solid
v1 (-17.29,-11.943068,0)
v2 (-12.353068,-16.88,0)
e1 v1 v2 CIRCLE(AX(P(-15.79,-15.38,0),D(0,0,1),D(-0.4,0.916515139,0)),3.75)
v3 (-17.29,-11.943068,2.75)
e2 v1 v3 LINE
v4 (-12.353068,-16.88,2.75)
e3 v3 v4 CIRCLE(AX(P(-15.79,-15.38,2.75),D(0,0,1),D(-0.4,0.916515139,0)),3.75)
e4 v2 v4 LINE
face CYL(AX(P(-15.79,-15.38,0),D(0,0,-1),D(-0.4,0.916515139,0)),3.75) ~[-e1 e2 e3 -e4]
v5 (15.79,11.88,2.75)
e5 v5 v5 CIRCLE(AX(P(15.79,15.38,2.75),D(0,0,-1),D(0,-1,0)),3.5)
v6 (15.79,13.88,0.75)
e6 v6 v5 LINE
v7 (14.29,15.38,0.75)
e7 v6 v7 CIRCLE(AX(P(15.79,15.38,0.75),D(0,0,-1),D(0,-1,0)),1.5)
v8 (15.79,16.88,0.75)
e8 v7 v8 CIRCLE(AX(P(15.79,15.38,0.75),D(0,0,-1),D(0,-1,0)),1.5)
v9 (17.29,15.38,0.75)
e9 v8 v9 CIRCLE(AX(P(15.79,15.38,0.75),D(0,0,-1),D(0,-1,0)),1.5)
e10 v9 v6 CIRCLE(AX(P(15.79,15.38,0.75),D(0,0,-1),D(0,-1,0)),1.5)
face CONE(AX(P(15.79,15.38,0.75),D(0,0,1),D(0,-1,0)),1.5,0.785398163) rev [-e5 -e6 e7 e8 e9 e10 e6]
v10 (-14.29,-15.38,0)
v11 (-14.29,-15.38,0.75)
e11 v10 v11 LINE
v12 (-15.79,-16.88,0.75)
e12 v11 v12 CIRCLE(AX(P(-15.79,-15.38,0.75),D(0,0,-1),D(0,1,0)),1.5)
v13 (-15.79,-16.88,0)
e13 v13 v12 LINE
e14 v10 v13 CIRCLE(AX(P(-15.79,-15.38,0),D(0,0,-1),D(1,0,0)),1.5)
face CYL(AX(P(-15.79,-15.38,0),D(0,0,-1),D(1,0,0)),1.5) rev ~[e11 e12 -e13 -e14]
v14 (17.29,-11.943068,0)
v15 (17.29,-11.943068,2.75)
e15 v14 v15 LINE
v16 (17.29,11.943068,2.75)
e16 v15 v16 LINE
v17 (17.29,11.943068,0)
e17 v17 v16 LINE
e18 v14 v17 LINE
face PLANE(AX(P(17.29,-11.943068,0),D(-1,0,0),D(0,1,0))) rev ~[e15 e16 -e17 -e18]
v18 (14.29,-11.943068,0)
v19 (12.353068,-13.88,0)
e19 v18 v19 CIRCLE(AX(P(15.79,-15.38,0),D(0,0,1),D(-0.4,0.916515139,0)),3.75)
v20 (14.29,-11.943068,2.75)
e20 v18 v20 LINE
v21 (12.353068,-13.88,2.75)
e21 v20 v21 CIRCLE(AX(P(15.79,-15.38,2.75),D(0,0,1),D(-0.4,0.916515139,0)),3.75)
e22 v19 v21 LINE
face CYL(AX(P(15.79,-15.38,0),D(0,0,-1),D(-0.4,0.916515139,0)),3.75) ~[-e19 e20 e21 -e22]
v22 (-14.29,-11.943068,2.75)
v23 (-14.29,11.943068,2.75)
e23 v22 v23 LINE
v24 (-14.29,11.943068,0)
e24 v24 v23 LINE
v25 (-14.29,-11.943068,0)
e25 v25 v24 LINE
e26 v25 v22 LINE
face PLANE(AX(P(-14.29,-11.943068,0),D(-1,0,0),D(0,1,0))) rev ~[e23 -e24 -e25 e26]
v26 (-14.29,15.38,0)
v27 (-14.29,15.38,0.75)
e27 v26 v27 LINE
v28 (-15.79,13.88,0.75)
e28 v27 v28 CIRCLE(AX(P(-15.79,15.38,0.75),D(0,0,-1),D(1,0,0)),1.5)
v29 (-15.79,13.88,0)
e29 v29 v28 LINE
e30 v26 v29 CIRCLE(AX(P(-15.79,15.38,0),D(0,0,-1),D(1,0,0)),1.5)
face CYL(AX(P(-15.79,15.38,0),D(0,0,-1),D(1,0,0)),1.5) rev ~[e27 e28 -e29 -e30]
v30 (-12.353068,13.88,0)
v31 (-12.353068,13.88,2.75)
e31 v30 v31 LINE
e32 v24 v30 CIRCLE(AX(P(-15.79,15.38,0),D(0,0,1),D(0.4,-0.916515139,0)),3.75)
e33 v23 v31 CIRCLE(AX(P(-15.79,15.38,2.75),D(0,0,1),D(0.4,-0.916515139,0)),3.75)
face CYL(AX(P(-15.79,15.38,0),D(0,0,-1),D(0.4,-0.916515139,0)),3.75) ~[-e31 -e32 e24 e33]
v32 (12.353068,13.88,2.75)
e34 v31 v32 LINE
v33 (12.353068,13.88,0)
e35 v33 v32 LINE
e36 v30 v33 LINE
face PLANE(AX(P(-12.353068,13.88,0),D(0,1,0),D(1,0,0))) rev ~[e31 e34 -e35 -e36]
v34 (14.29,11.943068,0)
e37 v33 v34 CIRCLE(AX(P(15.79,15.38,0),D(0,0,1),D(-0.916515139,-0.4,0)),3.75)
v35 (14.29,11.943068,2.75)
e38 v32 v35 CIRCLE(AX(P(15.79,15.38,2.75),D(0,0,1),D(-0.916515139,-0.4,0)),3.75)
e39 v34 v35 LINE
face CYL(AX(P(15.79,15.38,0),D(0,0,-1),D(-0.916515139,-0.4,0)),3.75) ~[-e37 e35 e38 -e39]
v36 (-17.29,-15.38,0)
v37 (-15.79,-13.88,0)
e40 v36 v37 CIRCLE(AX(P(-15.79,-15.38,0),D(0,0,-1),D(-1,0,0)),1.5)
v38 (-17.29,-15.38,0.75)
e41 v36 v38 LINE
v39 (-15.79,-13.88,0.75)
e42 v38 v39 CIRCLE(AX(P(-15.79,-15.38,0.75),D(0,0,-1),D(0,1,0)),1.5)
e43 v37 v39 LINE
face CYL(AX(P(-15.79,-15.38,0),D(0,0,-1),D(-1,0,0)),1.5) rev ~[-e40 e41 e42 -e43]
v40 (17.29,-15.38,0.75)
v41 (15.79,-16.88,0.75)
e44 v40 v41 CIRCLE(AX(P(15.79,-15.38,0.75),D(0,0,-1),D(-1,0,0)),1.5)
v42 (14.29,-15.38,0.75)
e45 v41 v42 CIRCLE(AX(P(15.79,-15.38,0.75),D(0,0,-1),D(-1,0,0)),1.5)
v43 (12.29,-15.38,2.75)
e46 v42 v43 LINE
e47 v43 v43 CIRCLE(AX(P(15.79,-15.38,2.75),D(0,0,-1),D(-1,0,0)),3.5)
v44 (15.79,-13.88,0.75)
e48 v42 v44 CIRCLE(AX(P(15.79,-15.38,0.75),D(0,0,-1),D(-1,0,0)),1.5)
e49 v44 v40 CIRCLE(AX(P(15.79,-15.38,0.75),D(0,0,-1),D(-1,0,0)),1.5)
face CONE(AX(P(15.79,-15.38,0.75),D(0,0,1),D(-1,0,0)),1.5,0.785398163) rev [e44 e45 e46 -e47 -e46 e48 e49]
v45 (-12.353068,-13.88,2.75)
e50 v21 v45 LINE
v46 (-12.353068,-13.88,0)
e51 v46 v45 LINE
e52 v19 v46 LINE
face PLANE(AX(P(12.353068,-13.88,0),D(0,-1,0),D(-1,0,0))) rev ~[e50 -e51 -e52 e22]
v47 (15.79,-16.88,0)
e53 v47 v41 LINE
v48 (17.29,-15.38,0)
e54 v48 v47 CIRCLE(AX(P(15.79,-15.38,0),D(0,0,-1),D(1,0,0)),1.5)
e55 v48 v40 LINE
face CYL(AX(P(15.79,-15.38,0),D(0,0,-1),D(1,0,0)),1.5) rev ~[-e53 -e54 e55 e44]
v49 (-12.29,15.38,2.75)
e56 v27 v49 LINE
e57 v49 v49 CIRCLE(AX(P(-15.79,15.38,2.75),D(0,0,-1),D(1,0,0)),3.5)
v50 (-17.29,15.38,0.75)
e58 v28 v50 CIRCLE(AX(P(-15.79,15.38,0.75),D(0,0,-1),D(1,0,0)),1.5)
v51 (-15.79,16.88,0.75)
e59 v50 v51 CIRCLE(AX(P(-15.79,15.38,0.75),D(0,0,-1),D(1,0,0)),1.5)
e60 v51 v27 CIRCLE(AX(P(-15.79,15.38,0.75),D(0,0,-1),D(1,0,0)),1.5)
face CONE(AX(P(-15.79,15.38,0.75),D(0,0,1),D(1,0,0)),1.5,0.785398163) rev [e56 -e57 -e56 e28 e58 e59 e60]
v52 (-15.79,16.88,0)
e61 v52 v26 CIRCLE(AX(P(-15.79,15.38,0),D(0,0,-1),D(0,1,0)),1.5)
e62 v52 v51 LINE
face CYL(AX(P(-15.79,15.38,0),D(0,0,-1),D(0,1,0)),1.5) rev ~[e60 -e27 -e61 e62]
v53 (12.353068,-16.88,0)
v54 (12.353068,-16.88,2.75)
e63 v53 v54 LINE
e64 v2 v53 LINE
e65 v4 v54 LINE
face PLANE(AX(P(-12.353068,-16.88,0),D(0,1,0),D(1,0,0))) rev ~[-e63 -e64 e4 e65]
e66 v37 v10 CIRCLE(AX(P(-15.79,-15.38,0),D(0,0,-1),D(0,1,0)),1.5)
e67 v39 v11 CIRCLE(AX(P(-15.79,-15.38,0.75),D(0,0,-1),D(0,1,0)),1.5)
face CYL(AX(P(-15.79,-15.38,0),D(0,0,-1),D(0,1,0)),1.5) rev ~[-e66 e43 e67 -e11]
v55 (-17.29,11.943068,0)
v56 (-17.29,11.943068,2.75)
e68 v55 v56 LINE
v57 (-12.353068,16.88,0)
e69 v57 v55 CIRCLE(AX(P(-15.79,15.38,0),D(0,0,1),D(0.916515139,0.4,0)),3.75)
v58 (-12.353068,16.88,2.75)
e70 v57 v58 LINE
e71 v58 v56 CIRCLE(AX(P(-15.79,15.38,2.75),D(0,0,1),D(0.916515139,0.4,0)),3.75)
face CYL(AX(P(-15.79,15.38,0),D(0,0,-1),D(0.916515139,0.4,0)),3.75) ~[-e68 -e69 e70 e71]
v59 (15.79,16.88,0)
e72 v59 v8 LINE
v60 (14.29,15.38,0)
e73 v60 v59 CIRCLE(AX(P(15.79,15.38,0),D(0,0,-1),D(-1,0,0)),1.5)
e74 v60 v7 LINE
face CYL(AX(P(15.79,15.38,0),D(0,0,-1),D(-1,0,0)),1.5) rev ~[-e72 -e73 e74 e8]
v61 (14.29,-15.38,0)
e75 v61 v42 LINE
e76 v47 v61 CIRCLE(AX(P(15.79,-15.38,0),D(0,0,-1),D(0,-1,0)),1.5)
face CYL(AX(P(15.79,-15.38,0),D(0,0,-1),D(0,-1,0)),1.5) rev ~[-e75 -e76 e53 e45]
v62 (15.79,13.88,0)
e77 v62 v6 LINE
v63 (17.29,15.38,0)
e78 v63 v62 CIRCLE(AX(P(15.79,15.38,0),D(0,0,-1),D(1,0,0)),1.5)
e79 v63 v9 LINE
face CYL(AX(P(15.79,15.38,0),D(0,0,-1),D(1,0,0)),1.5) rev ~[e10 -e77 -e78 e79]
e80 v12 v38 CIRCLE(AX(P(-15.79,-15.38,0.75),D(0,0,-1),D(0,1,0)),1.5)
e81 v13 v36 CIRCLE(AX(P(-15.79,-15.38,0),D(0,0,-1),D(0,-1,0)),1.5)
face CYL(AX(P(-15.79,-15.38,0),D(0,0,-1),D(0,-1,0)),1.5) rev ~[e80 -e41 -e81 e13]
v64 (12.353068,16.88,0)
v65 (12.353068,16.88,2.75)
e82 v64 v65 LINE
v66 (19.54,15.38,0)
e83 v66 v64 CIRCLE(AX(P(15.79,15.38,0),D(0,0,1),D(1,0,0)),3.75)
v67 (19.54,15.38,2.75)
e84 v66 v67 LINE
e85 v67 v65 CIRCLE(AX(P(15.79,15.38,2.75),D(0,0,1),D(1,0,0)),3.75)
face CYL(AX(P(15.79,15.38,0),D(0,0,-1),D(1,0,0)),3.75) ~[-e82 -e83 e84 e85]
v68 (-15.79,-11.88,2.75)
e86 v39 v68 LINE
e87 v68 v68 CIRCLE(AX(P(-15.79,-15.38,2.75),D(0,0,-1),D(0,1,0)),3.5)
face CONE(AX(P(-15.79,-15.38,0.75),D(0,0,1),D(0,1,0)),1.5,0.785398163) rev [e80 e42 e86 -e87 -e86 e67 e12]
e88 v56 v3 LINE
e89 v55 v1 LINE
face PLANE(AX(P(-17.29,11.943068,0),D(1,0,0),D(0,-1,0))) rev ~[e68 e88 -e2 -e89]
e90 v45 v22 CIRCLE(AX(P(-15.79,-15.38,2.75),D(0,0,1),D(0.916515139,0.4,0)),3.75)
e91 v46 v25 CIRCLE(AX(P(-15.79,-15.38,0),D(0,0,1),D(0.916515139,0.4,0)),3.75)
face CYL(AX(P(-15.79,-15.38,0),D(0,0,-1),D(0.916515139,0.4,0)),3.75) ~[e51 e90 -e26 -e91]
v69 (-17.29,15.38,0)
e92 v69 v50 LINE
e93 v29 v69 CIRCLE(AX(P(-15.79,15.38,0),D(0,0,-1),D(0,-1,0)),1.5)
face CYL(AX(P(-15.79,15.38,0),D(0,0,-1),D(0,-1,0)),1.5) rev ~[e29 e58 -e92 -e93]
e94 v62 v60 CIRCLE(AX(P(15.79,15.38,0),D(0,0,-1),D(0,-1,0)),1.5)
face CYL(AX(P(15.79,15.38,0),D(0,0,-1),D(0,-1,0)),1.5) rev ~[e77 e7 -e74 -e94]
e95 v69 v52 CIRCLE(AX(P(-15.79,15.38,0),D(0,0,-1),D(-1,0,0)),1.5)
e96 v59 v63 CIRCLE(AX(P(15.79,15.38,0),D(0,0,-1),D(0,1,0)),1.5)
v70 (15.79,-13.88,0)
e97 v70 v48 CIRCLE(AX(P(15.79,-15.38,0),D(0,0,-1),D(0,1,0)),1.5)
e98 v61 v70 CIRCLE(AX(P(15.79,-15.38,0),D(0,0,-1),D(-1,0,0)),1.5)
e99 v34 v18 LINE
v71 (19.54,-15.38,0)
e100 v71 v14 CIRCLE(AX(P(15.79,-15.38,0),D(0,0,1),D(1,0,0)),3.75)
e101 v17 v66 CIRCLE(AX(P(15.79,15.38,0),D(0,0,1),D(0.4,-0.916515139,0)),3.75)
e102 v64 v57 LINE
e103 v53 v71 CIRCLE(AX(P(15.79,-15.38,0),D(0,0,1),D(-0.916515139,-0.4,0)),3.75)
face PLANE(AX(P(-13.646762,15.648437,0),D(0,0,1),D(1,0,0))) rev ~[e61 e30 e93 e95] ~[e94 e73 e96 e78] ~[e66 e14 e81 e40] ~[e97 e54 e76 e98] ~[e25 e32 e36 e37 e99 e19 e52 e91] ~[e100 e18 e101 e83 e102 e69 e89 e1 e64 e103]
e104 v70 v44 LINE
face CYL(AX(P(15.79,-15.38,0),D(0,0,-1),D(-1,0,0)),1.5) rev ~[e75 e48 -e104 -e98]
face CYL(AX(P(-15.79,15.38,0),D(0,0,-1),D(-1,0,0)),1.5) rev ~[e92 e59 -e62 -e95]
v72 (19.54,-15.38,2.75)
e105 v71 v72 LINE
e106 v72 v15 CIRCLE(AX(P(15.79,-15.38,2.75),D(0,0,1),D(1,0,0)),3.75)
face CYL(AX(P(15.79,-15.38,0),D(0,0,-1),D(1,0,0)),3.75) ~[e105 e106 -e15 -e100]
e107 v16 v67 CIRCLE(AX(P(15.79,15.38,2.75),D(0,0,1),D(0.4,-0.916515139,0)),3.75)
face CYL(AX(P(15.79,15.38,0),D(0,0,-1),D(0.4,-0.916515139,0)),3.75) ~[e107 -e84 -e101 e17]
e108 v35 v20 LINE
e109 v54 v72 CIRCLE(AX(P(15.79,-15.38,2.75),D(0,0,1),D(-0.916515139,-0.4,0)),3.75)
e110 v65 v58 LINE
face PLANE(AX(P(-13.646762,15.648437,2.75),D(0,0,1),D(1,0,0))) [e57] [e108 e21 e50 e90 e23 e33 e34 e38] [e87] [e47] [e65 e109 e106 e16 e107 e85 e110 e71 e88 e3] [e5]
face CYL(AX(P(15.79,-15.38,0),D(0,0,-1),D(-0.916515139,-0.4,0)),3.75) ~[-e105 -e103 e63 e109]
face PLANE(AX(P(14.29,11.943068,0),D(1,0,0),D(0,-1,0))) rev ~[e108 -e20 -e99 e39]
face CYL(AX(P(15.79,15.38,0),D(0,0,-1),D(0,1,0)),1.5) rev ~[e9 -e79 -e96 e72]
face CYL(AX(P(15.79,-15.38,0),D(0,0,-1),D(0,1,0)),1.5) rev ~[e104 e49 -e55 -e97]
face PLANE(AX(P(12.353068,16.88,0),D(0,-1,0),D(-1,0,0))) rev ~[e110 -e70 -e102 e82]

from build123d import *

# Parameters (mm, degrees)
F1_DEPTH = 2.75


# Not quite as in the source:
# - a fillet or chamfer that OpenCascade refuses, or shapes differently, is made with other operations: its cross-section is extruded or revolved along the edge and cut away or added


with BuildPart() as f1:
    # F0 (on Top) → F1 (new body)
    with BuildSketch(Plane.XY):
        with BuildLine():
            ThreePointArc((-15.79, 16.88), (-14.7293398282, 16.4406601718), (-14.29, 15.38))
            Line((-14.29, 15.38), (-14.29, 13.88))
            Line((-14.29, 13.88), (-12.3530682288, 13.88))
            ThreePointArc((-12.3530682288, 13.88), (-12.1191013265, 14.6138388362), (-12.04, 15.38))
            ThreePointArc((-12.04, 15.38), (-12.1191013265, 16.1461611638), (-12.3530682288, 16.88))
            Line((-12.3530682288, 16.88), (-15.79, 16.88))
        make_face()
        with BuildLine():
            ThreePointArc((-17.29, 15.38), (-16.8506601718, 16.4406601718), (-15.79, 16.88))
            Line((-15.79, 16.88), (-12.3530682288, 16.88))
            ThreePointArc((-12.3530682288, 16.88), (-18.4416504294, 18.0316504294), (-17.29, 11.9430682288))
            Line((-17.29, 11.9430682288), (-17.29, 15.38))
        make_face()
        with BuildLine():
            Line((-14.29, 13.88), (-15.79, 13.88))
            ThreePointArc((-15.79, 13.88), (-16.8506601718, 14.3193398282), (-17.29, 15.38))
            Line((-17.29, 15.38), (-17.29, 11.9430682288))
            ThreePointArc((-17.29, 11.9430682288), (-15.79, 11.63), (-14.29, 11.9430682288))
            Line((-14.29, 11.9430682288), (-14.29, 13.88))
        make_face()
        with BuildLine():
            Line((12.3530682288, 16.88), (-12.3530682288, 16.88))
            ThreePointArc((-12.3530682288, 16.88), (-12.1191013265, 16.1461611638), (-12.04, 15.38))
            ThreePointArc((-12.04, 15.38), (-12.1191013265, 14.6138388362), (-12.3530682288, 13.88))
            Line((-12.3530682288, 13.88), (12.3530682288, 13.88))
            ThreePointArc((12.3530682288, 13.88), (12.04, 15.38), (12.3530682288, 16.88))
        make_face()
        with BuildLine():
            Line((-14.29, -11.9430682288), (-14.29, 11.9430682288))
            ThreePointArc((-14.29, 11.9430682288), (-15.79, 11.63), (-17.29, 11.9430682288))
            Line((-17.29, 11.9430682288), (-17.29, -11.9430682288))
            ThreePointArc((-17.29, -11.9430682288), (-15.79, -11.63), (-14.29, -11.9430682288))
        make_face()
        with BuildLine():
            Line((15.79, 16.88), (12.3530682288, 16.88))
            ThreePointArc((12.3530682288, 16.88), (12.04, 15.38), (12.3530682288, 13.88))
            Line((12.3530682288, 13.88), (14.29, 13.88))
            Line((14.29, 13.88), (14.29, 15.38))
            ThreePointArc((14.29, 15.38), (14.7293398282, 16.4406601718), (15.79, 16.88))
        make_face()
        with BuildLine():
            ThreePointArc((19.54, 15.38), (16.5561611638, 19.0508986735), (12.3530682288, 16.88))
            Line((12.3530682288, 16.88), (15.79, 16.88))
            ThreePointArc((15.79, 16.88), (16.8506601718, 16.4406601718), (17.29, 15.38))
            Line((17.29, 15.38), (17.29, 11.9430682288))
            ThreePointArc((17.29, 11.9430682288), (18.9274750995, 13.3260404094), (19.54, 15.38))
        make_face()
        with BuildLine():
            Line((-14.29, -13.88), (-14.29, -11.9430682288))
            ThreePointArc((-14.29, -11.9430682288), (-15.79, -11.63), (-17.29, -11.9430682288))
            Line((-17.29, -11.9430682288), (-17.29, -15.38))
            ThreePointArc((-17.29, -15.38), (-16.8506601718, -14.3193398282), (-15.79, -13.88))
            Line((-15.79, -13.88), (-14.29, -13.88))
        make_face()
        with BuildLine():
            Line((-17.29, -15.38), (-17.29, -11.9430682288))
            ThreePointArc((-17.29, -11.9430682288), (-18.4416504294, -18.0316504294), (-12.3530682288, -16.88))
            Line((-12.3530682288, -16.88), (-15.79, -16.88))
            ThreePointArc((-15.79, -16.88), (-16.8506601718, -16.4406601718), (-17.29, -15.38))
        make_face()
        with BuildLine():
            Line((12.3530682288, -13.88), (-12.3530682288, -13.88))
            ThreePointArc((-12.3530682288, -13.88), (-12.1191013265, -14.6138388362), (-12.04, -15.38))
            ThreePointArc((-12.04, -15.38), (-12.1191013265, -16.1461611638), (-12.3530682288, -16.88))
            Line((-12.3530682288, -16.88), (12.3530682288, -16.88))
            ThreePointArc((12.3530682288, -16.88), (12.04, -15.38), (12.3530682288, -13.88))
        make_face()
        with BuildLine():
            ThreePointArc((-12.04, -15.38), (-12.1191013265, -14.6138388362), (-12.3530682288, -13.88))
            Line((-12.3530682288, -13.88), (-14.29, -13.88))
            Line((-14.29, -13.88), (-14.29, -15.38))
            ThreePointArc((-14.29, -15.38), (-14.7293398282, -16.4406601718), (-15.79, -16.88))
            Line((-15.79, -16.88), (-12.3530682288, -16.88))
            ThreePointArc((-12.3530682288, -16.88), (-12.1191013265, -16.1461611638), (-12.04, -15.38))
        make_face()
        with BuildLine():
            Line((14.29, 13.88), (14.29, 11.9430682288))
            ThreePointArc((14.29, 11.9430682288), (15.79, 11.63), (17.29, 11.9430682288))
            Line((17.29, 11.9430682288), (17.29, 15.38))
            ThreePointArc((17.29, 15.38), (16.8506601718, 14.3193398282), (15.79, 13.88))
            Line((15.79, 13.88), (14.29, 13.88))
        make_face()
        with BuildLine():
            ThreePointArc((17.29, 11.9430682288), (15.79, 11.63), (14.29, 11.9430682288))
            Line((14.29, 11.9430682288), (14.29, -11.9430682288))
            ThreePointArc((14.29, -11.9430682288), (15.79, -11.63), (17.29, -11.9430682288))
            Line((17.29, -11.9430682288), (17.29, 11.9430682288))
        make_face()
        with BuildLine():
            Line((14.29, -13.88), (12.3530682288, -13.88))
            ThreePointArc((12.3530682288, -13.88), (12.04, -15.38), (12.3530682288, -16.88))
            Line((12.3530682288, -16.88), (15.79, -16.88))
            ThreePointArc((15.79, -16.88), (14.7293398282, -16.4406601718), (14.29, -15.38))
            Line((14.29, -15.38), (14.29, -13.88))
        make_face()
        with BuildLine():
            ThreePointArc((17.29, -11.9430682288), (15.79, -11.63), (14.29, -11.9430682288))
            Line((14.29, -11.9430682288), (14.29, -13.88))
            Line((14.29, -13.88), (15.79, -13.88))
            ThreePointArc((15.79, -13.88), (16.8506601718, -14.3193398282), (17.29, -15.38))
            Line((17.29, -15.38), (17.29, -11.9430682288))
        make_face()
        with BuildLine():
            Line((15.79, -16.88), (12.3530682288, -16.88))
            ThreePointArc((12.3530682288, -16.88), (16.5561611638, -19.0508986735), (19.54, -15.38))
            ThreePointArc((19.54, -15.38), (18.9274750995, -13.3260404094), (17.29, -11.9430682288))
            Line((17.29, -11.9430682288), (17.29, -15.38))
            ThreePointArc((17.29, -15.38), (16.8506601718, -16.4406601718), (15.79, -16.88))
        make_face()
        with BuildLine():
            Line((-14.29, 13.88), (-14.29, 15.38))
            ThreePointArc((-14.29, 15.38), (-14.7293398282, 14.3193398282), (-15.79, 13.88))
            Line((-15.79, 13.88), (-14.29, 13.88))
        make_face()
        with BuildLine():
            Line((-12.3530682288, 13.88), (-14.29, 13.88))
            Line((-14.29, 13.88), (-14.29, 11.9430682288))
            ThreePointArc((-14.29, 11.9430682288), (-13.1383495706, 12.7283495706), (-12.3530682288, 13.88))
        make_face()
        with BuildLine():
            Line((14.29, 13.88), (12.3530682288, 13.88))
            ThreePointArc((12.3530682288, 13.88), (13.1383495706, 12.7283495706), (14.29, 11.9430682288))
            Line((14.29, 11.9430682288), (14.29, 13.88))
        make_face()
        with BuildLine():
            Line((14.29, 15.38), (14.29, 13.88))
            Line((14.29, 13.88), (15.79, 13.88))
            ThreePointArc((15.79, 13.88), (14.7293398282, 14.3193398282), (14.29, 15.38))
        make_face()
        with BuildLine():
            Line((-14.29, -15.38), (-14.29, -13.88))
            Line((-14.29, -13.88), (-15.79, -13.88))
            ThreePointArc((-15.79, -13.88), (-14.7293398282, -14.3193398282), (-14.29, -15.38))
        make_face()
        with BuildLine():
            ThreePointArc((-12.3530682288, -13.88), (-13.1383495706, -12.7283495706), (-14.29, -11.9430682288))
            Line((-14.29, -11.9430682288), (-14.29, -13.88))
            Line((-14.29, -13.88), (-12.3530682288, -13.88))
        make_face()
        with BuildLine():
            Line((15.79, -13.88), (14.29, -13.88))
            Line((14.29, -13.88), (14.29, -15.38))
            ThreePointArc((14.29, -15.38), (14.7293398282, -14.3193398282), (15.79, -13.88))
        make_face()
        with BuildLine():
            ThreePointArc((14.29, -11.9430682288), (13.1383495706, -12.7283495706), (12.3530682288, -13.88))
            Line((12.3530682288, -13.88), (14.29, -13.88))
            Line((14.29, -13.88), (14.29, -11.9430682288))
        make_face()
    extrude(amount=F1_DEPTH)

    # F2: chamfer of 2 on 4 edges, made by hand

    # F2_s1 → F2_t2 (revolve, cut)
    with BuildSketch(Plane.XZ.offset(-15.38)):
        Polygon((-14.29, 0.75), (-12.29, 2.75), (-14.29, 2.75), align=None)
    revolve(axis=Axis((-15.79, 15.38, 2.75), (0, 0, -1)), mode=Mode.SUBTRACT)

    # F2_s3 → F2_t4 (revolve, cut)
    with BuildSketch(Plane.YZ.offset(15.79)):
        Polygon((13.88, 0.75), (11.88, 2.75), (13.88, 2.75), align=None)
    revolve(axis=Axis((15.79, 15.38, 2.75), (0, 0, -1)), mode=Mode.SUBTRACT)

    # F2_s5 → F2_t6 (revolve, cut)
    with BuildSketch(Plane.XZ.offset(15.38)):
        Polygon((14.29, 0.75), (12.29, 2.75), (14.29, 2.75), align=None)
    revolve(axis=Axis((15.79, -15.38, 2.75), (0, 0, -1)), mode=Mode.SUBTRACT)

    # F2_s7 → F2_t8 (revolve, cut)
    with BuildSketch(Plane.YZ.offset(-15.79)):
        Polygon((-13.88, 0.75), (-11.88, 2.75), (-13.88, 2.75), align=None)
    revolve(axis=Axis((-15.79, -15.38, 2.75), (0, 0, -1)), mode=Mode.SUBTRACT)


solid = f1.part
